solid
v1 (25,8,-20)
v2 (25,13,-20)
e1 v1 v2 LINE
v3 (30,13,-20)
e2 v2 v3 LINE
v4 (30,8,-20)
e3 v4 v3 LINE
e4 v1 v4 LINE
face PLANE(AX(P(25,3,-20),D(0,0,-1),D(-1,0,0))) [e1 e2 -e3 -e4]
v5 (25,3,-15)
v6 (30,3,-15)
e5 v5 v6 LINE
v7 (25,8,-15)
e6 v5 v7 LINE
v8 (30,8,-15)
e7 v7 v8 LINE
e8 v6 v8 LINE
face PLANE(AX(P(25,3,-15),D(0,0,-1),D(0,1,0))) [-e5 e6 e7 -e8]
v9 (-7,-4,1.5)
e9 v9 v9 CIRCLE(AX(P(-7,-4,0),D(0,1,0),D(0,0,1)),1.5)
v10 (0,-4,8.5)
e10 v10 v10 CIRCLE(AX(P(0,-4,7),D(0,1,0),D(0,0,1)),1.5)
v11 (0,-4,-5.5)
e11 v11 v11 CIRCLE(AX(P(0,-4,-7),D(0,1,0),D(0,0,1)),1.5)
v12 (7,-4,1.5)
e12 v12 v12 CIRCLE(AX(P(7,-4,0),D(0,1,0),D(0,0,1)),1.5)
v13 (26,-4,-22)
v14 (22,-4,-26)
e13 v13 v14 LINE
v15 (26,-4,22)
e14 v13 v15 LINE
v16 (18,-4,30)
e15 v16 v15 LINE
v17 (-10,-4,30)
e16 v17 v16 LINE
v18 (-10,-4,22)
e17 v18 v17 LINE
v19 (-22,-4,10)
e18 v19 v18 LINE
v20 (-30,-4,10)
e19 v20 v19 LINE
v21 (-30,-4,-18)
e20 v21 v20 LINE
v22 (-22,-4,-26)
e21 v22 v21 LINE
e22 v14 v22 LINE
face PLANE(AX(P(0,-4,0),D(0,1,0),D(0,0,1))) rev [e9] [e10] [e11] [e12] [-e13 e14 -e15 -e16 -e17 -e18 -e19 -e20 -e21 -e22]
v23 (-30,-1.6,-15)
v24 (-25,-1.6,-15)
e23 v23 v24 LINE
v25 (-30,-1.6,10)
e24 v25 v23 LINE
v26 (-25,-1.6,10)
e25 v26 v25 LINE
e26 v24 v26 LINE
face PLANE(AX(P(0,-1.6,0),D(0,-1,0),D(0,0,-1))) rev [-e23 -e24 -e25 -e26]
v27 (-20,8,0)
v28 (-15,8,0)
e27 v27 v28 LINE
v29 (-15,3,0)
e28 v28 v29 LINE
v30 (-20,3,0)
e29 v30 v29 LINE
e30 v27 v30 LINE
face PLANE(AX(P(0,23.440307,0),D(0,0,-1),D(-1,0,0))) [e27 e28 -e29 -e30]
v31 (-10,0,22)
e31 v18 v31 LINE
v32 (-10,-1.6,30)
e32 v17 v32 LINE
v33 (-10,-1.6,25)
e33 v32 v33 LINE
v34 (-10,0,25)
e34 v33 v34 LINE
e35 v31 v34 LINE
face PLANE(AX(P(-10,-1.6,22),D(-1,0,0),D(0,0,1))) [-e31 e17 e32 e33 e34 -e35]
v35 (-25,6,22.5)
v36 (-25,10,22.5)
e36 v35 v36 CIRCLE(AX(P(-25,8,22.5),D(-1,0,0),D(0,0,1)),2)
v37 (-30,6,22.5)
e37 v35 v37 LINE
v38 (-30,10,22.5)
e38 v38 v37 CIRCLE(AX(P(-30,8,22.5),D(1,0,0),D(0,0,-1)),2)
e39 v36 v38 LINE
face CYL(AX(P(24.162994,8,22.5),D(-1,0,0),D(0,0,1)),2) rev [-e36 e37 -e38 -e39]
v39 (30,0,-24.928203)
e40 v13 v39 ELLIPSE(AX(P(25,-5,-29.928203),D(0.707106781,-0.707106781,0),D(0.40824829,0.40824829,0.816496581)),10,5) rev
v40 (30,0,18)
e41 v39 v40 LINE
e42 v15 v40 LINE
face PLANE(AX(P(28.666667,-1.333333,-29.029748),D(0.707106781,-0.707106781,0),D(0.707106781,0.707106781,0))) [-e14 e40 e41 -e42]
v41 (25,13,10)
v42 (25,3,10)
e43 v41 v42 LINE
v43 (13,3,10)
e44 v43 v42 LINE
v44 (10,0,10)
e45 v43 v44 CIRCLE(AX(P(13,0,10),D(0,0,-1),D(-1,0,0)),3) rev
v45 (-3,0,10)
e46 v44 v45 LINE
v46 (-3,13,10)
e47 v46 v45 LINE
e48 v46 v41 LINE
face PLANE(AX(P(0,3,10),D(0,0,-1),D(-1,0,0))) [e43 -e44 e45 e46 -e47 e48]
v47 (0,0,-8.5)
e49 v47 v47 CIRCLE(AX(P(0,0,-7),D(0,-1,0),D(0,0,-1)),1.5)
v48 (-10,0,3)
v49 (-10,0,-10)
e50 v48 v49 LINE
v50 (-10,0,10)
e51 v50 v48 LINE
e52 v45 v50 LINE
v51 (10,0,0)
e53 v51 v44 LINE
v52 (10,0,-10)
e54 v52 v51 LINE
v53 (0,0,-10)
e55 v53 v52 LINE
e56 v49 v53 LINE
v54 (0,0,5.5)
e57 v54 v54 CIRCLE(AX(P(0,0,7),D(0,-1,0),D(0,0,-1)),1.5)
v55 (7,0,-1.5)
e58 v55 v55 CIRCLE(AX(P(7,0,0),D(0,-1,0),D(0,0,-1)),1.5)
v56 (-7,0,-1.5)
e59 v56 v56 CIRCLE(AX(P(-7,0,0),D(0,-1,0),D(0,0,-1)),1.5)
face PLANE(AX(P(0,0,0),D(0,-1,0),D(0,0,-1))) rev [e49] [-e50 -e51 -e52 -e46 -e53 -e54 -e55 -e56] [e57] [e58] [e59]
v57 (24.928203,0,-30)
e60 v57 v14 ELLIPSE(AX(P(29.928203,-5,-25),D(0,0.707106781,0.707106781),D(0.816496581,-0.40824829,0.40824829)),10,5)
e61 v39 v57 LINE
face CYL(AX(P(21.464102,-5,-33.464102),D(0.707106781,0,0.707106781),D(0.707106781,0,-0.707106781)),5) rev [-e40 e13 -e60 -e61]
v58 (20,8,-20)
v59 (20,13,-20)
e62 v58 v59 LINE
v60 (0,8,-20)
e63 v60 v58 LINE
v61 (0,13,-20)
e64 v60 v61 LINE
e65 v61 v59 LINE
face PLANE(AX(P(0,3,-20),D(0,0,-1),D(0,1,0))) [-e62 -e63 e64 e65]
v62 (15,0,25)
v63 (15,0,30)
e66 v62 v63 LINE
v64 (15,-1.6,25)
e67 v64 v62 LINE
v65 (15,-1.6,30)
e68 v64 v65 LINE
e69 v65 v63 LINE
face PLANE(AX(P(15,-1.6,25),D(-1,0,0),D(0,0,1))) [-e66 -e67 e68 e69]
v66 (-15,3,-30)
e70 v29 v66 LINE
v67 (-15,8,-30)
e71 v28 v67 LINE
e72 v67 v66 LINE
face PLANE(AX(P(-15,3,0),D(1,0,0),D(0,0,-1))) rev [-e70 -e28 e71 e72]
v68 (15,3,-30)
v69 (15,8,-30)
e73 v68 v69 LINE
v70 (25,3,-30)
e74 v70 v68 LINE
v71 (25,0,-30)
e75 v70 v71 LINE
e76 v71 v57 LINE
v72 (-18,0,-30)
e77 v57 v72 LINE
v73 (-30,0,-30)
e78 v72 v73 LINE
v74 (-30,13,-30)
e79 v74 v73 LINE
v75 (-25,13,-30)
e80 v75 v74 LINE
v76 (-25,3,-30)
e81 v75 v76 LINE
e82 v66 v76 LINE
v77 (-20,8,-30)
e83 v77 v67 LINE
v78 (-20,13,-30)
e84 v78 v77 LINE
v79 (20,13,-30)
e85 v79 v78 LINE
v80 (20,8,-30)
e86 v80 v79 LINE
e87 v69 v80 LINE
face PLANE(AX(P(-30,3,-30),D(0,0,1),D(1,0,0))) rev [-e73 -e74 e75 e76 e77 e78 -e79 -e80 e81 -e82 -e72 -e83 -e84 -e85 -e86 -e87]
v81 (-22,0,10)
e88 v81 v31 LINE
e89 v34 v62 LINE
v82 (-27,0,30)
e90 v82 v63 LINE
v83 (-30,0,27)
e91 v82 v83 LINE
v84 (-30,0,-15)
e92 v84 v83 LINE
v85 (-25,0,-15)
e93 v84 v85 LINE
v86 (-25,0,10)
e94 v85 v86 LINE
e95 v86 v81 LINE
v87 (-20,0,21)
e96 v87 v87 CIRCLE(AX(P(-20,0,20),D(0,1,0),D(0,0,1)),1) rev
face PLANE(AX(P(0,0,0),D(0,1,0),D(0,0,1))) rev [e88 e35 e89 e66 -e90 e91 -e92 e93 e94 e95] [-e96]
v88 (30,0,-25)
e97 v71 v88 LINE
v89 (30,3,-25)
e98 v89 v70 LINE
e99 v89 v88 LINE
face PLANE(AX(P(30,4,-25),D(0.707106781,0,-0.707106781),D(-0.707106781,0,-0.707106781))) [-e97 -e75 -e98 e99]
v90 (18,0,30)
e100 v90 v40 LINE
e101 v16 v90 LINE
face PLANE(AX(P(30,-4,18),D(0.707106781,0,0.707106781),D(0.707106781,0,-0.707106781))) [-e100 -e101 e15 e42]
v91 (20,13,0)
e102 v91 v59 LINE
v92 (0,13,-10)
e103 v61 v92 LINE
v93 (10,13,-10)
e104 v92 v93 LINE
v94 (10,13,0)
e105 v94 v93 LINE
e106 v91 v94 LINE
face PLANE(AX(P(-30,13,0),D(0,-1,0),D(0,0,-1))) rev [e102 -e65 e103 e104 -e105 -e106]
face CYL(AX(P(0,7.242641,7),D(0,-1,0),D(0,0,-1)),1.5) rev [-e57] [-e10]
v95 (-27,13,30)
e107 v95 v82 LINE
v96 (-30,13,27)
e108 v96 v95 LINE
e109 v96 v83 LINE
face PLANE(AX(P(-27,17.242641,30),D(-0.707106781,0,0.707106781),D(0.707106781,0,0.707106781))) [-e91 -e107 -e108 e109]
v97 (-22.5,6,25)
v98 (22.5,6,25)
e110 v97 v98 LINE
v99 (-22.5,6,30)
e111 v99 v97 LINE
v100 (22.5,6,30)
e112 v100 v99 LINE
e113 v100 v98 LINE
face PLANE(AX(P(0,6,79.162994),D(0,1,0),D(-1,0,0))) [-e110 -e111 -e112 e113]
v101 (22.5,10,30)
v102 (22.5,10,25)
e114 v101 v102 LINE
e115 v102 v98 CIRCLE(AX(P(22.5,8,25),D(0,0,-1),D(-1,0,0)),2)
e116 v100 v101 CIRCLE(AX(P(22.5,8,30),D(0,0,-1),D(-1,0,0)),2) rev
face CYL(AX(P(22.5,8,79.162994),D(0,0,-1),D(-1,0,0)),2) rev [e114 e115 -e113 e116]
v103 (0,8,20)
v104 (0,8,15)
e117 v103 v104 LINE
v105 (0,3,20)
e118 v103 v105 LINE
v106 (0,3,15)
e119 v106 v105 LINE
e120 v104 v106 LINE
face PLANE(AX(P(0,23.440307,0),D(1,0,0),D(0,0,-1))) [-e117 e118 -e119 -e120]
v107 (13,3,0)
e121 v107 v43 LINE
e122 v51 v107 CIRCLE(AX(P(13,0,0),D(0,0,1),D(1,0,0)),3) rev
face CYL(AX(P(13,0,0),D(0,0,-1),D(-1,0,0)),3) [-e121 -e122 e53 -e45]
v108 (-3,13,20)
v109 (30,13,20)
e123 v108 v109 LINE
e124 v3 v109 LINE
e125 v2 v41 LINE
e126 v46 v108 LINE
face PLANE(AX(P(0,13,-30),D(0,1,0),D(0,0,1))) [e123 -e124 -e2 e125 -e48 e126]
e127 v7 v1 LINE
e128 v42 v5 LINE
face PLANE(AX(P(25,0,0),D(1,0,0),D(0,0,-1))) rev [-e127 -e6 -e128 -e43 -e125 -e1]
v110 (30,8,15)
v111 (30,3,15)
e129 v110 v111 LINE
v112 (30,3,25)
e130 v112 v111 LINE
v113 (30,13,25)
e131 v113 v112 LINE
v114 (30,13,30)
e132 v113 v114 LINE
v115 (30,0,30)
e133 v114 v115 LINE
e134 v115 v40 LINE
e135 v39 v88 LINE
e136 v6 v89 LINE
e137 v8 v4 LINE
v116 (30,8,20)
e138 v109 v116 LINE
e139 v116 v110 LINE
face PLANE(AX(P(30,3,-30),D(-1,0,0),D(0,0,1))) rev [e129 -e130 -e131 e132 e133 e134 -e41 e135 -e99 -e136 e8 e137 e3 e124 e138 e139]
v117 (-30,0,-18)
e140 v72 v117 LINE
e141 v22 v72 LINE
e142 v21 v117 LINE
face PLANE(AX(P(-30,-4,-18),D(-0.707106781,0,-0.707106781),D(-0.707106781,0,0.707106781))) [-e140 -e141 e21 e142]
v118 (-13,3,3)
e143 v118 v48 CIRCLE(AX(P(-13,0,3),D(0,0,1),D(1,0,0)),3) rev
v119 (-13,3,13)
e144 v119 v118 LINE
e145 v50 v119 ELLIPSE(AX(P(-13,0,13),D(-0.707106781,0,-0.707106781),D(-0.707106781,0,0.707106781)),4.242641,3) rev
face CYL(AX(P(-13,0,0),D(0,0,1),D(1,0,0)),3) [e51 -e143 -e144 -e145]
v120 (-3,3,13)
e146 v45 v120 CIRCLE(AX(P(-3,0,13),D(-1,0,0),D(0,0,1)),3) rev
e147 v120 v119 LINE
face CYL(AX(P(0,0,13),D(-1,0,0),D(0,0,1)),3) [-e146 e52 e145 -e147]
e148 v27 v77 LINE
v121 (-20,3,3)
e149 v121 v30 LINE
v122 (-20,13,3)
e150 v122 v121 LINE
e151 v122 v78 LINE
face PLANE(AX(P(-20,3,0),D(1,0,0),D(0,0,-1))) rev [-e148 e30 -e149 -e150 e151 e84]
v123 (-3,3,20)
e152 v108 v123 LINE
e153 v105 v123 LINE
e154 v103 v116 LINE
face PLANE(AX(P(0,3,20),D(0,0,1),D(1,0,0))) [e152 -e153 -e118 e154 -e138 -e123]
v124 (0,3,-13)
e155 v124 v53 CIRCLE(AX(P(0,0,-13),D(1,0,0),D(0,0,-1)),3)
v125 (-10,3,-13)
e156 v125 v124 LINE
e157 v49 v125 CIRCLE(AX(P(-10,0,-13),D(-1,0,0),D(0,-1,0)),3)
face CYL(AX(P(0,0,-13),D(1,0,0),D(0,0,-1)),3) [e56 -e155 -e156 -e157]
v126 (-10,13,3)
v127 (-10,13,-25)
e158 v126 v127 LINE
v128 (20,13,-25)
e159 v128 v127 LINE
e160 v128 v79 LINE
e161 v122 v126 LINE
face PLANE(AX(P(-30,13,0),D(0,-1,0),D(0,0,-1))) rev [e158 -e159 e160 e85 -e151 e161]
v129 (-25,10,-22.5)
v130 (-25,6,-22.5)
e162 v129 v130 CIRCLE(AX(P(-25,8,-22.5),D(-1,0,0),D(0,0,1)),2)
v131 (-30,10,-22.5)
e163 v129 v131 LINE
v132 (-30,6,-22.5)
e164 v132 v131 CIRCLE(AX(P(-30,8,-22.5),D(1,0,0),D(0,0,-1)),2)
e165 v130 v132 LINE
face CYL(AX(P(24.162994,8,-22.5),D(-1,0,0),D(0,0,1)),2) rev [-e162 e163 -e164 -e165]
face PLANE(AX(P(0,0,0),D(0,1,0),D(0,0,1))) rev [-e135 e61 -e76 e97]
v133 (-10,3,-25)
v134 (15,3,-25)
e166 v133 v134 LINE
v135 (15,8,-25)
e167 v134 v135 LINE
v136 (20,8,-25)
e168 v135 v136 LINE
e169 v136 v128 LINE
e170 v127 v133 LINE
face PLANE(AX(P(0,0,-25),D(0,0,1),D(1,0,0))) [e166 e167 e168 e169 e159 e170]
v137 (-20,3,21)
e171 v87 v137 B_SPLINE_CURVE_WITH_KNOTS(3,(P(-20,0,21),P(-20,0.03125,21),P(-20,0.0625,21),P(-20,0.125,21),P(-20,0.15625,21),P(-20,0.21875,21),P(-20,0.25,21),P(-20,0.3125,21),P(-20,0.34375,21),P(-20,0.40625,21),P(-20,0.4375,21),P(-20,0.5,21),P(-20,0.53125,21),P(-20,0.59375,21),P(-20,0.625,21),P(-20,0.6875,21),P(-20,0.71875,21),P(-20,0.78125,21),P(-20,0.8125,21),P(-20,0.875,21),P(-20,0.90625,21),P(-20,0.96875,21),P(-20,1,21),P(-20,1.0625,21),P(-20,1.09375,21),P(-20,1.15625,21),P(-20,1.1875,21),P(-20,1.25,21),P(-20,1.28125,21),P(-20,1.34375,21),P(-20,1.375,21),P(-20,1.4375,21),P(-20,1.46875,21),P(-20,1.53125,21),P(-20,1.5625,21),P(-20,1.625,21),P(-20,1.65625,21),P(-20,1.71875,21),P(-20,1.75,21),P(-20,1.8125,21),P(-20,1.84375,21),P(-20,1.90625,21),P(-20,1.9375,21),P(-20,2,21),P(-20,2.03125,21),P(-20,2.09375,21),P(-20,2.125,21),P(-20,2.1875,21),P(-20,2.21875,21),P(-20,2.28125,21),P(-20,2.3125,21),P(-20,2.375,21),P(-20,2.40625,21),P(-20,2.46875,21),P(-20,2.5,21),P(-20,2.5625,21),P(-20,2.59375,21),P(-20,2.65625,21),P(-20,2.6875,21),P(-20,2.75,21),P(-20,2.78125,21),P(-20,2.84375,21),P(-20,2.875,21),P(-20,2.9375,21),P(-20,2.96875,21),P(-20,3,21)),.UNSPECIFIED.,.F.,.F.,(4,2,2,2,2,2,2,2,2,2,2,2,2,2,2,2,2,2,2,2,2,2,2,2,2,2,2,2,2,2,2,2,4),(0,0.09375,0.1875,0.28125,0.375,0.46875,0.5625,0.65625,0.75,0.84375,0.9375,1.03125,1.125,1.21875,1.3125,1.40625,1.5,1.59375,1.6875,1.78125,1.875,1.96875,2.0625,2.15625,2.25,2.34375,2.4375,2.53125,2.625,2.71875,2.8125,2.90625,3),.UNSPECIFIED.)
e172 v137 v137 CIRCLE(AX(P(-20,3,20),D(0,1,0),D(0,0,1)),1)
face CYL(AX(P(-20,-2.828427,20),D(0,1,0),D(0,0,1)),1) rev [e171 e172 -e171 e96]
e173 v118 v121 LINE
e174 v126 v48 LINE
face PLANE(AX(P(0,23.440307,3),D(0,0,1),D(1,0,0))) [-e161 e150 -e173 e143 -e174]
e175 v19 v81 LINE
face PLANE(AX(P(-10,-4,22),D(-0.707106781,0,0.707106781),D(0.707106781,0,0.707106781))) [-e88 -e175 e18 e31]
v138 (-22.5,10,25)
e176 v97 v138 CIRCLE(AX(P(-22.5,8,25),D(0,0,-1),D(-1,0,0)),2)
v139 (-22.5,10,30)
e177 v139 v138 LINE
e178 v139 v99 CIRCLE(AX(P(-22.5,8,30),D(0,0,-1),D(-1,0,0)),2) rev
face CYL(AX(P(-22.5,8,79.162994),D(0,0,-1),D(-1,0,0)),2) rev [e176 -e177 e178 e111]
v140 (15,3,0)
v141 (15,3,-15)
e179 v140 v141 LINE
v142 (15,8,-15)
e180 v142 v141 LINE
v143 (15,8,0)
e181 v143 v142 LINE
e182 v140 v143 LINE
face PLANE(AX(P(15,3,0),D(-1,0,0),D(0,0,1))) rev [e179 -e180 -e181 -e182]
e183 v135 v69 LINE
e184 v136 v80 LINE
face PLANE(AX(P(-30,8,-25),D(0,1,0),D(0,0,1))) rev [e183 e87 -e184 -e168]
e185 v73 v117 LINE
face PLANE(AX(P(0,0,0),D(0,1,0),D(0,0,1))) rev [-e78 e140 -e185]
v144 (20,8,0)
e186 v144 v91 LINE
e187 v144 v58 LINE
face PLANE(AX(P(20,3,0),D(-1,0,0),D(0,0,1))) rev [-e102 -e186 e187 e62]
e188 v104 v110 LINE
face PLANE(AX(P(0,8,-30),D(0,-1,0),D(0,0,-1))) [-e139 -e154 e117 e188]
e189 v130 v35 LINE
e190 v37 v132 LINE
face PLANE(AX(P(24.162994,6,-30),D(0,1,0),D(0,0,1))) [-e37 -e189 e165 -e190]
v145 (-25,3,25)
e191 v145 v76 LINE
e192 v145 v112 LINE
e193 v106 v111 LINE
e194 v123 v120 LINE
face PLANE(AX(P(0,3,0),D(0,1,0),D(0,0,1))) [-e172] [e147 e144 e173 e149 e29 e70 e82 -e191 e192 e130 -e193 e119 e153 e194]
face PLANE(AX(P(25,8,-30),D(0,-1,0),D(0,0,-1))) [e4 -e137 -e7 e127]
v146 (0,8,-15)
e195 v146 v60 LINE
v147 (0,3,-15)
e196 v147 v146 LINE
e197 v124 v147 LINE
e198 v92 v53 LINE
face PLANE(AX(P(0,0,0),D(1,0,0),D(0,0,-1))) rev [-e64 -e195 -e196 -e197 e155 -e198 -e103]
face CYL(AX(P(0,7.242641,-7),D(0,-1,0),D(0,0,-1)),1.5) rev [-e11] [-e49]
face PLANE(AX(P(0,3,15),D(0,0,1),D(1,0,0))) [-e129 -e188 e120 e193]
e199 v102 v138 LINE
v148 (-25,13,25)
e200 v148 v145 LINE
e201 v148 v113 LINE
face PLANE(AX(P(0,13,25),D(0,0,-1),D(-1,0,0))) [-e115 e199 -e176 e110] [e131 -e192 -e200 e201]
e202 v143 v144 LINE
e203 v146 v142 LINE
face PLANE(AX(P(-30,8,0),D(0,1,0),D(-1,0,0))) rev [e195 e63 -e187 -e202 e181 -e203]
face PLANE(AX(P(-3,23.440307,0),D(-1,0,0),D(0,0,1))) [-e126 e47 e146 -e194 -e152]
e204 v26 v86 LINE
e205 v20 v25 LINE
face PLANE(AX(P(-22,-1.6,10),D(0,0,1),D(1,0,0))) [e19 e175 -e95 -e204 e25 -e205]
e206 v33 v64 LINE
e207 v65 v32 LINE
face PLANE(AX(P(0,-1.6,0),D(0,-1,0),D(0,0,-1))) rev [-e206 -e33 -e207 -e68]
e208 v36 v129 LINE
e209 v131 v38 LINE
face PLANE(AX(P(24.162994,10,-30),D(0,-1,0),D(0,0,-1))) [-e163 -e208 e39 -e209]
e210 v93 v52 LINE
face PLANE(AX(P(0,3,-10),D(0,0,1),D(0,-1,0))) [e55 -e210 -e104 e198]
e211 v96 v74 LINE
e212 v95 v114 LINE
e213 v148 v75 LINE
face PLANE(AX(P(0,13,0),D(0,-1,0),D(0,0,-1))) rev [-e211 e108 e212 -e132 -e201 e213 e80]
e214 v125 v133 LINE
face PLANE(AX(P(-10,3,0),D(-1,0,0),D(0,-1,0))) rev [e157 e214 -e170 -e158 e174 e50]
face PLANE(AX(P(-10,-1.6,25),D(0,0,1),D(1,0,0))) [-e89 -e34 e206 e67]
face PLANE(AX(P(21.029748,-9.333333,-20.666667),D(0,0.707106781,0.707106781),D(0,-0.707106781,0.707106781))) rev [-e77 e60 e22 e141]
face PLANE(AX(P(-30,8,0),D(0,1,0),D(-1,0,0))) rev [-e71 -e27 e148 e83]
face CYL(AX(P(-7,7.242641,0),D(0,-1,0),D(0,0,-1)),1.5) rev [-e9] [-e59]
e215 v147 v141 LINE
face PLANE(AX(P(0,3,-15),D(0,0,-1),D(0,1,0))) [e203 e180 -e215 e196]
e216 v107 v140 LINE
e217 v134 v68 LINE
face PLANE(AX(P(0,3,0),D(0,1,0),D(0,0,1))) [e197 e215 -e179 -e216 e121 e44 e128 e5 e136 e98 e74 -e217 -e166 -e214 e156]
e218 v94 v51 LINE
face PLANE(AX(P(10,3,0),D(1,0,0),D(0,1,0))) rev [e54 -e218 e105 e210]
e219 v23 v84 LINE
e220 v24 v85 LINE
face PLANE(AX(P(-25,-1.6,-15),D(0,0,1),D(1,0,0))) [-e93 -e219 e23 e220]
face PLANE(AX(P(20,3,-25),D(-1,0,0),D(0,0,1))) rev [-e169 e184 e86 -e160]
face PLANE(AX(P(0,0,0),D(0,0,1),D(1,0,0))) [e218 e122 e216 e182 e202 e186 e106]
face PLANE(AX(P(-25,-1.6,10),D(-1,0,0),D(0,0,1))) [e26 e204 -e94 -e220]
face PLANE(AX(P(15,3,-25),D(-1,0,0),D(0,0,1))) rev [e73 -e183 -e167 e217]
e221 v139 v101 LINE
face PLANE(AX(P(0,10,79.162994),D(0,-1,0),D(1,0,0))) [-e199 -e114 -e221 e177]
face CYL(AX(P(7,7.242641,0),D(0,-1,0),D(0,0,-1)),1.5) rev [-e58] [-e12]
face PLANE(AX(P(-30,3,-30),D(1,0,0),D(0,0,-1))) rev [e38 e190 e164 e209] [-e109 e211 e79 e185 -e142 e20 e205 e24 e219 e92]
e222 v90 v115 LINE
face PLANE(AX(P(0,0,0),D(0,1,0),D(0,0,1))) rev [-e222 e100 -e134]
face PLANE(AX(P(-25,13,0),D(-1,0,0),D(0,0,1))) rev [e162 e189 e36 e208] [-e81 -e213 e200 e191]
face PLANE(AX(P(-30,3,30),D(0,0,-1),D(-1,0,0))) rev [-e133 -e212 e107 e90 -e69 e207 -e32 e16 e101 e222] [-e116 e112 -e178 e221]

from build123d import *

# Parameters (mm, degrees)
SKETCH_2_W           = 60
SKETCH_2_H           = 60
EXTRUDE_1_DEPTH      = 3
SKETCH_6_R           = 1.5
CUT_EXTRUDE_2_DEPTH  = 3
EXTRUDE_START        = -30
EXTRUDE_2_DEPTH      = 30
EXTRUDE_START_2      = 30
EXTRUDE_3_DEPTH      = 30
CUT_EXTRUDE_START    = 13
SKETCH_9_W           = 10
SKETCH_9_H           = 10
CUT_EXTRUDE_3_DEPTH  = 10
CUT_EXTRUDE_START_2  = -15
SKETCH_10_W          = 5
SKETCH_10_H          = 5
CUT_EXTRUDE_4_DEPTH  = 5
CUT_EXTRUDE_START_3  = 10
SKETCH_11_W          = 5
SKETCH_11_H          = 5
CUT_EXTRUDE_5_DEPTH  = 5
EXTRUDE_5_DEPTH      = 1.6
EXTRUDE_START_3      = -1.6
SKETCH_17_W          = 28
SKETCH_17_H          = 8
SKETCH_17_W_2        = 8
SKETCH_17_H_2        = 28
EXTRUDE_6_DEPTH      = 2
SKETCH_21_R          = 12.5
EXTRUDE_8_DEPTH      = 4
CUT_EXTRUDE_START_4  = -4
SKETCH_22_R          = 1.5
CUT_EXTRUDE_6_DEPTH  = 4
EXTRUDE_START_4      = -4
SKETCH_23_R          = 1.5
EXTRUDE_9_DEPTH      = 4
EXTRUDE_START_5      = -3.6
SKETCH_24_W          = 8
SKETCH_24_H          = 28
SKETCH_24_W_2        = 28
SKETCH_24_H_2        = 8
EXTRUDE_10_DEPTH     = 0.4
EXTRUDE_START_6      = 3
SKETCH_25_W          = 10
SKETCH_25_H          = 3
SKETCH_25_W_2        = 3
SKETCH_25_H_2        = 10
EXTRUDE_11_DEPTH     = 10
SKETCH_26_W          = 55
SKETCH_26_H          = 5
SKETCH_26_W_2        = 5
SKETCH_26_H_2        = 55
EXTRUDE_12_DEPTH     = 10
CUT_EXTRUDE_START_5  = -30
CUT_EXTRUDE_7_DEPTH  = 5
CUT_EXTRUDE_START_6  = 25
CUT_EXTRUDE_8_DEPTH  = 5
CUT_EXTRUDE_START_7  = 3
SKETCH_31_R          = 1
CUT_EXTRUDE_10_DEPTH = 3
CUT_EXTRUDE_11_DEPTH = 4
CUT_EXTRUDE_12_DEPTH = 13
SKETCH_34_W          = 20
SKETCH_34_H          = 20
CUT_EXTRUDE_14_DEPTH = 3
SKETCH_35_W          = 20
SKETCH_35_H          = 10
EXTRUDE_14_DEPTH     = 5
SKETCH_36_W          = 20
SKETCH_36_H          = 10
EXTRUDE_15_DEPTH     = 5
EXTRUDE_16_DEPTH     = 5
EXTRUDE_18_DEPTH     = 5
EXTRUDE_19_DEPTH     = 4
CUT_EXTRUDE_START_8  = -22
CUT_EXTRUDE_15_DEPTH = 44
CUT_EXTRUDE_16_DEPTH = 44
FILLET_1_R           = 5
FILLET_2_R           = 3


# Some blends are built 0.0001 mm under size
with BuildPart() as part:
    # 草图2 → 凸台-拉伸1 (new body)
    with BuildSketch(Plane(origin=(0, 0, 0), x_dir=(1, 0, 0), z_dir=(0, 1, 0))):
        Rectangle(SKETCH_2_W, SKETCH_2_H)
    extrude(amount=EXTRUDE_1_DEPTH)

    # 草图6 → 切除-拉伸2 (cut)
    with BuildSketch(Plane(origin=(0, 0, 0), x_dir=(1, 0, 0), z_dir=(0, 1, 0))):
        with Locations(Location((0, -7, 0), (0, 0, 270))):
            Circle(SKETCH_6_R)
        with Locations(Location((7, 0, 0), (0, 0, 270))):
            Circle(SKETCH_6_R)
        with Locations(Location((0, 7, 0), (0, 0, 270))):
            Circle(SKETCH_6_R)
        with Locations(Location((-7, 0, 0), (0, 0, 270))):
            Circle(SKETCH_6_R)
    extrude(amount=CUT_EXTRUDE_2_DEPTH, mode=Mode.SUBTRACT)

    # 草图7 → 凸台-拉伸2 (add)
    with BuildSketch(Plane.XY.offset(EXTRUDE_START)):
        Polygon((-15, 3), (-15, 8), (-20, 8), (-20, 13), (-10, 13), (-10, 3), align=None)
        Polygon((10, 3), (15, 3), (15, 8), (20, 8), (20, 13), (10, 13), align=None)
    extrude(amount=EXTRUDE_2_DEPTH)

    # 草图8 → 凸台-拉伸3 (add)
    with BuildSketch(Plane(origin=(0, 0, 0), x_dir=(0, 0, -1), z_dir=(1, 0, 0)).offset(EXTRUDE_START_2)):
        Polygon((-15, 3), (-15, 8), (-20, 8), (-20, 13), (-10, 13), (-10, 3), align=None)
        Polygon((10, 3), (15, 3), (15, 8), (20, 8), (20, 13), (10, 13), align=None)
    extrude(amount=-EXTRUDE_3_DEPTH)

    # 草图9 → 切除-拉伸3 (cut)
    with BuildSketch(Plane(origin=(0, 0, 0), x_dir=(1, 0, 0), z_dir=(0, 1, 0)).offset(CUT_EXTRUDE_START)):
        with Locations((25, 15)):
            Rectangle(SKETCH_9_W, SKETCH_9_H)
        with Locations((15, 25)):
            Rectangle(SKETCH_9_W, SKETCH_9_H)
    extrude(amount=-CUT_EXTRUDE_3_DEPTH, mode=Mode.SUBTRACT)

    # 草图10 → 切除-拉伸4 (cut)
    with BuildSketch(Plane.XY.offset(CUT_EXTRUDE_START_2)):
        with Locations((17.5, 5.5)):
            Rectangle(SKETCH_10_W, SKETCH_10_H)
    extrude(amount=CUT_EXTRUDE_4_DEPTH, mode=Mode.SUBTRACT)

    # 草图11 → 切除-拉伸5 (cut)
    with BuildSketch(Plane(origin=(0, 0, 0), x_dir=(0, 0, -1), z_dir=(1, 0, 0)).offset(CUT_EXTRUDE_START_3)):
        with Locations((17.5, 5.5)):
            Rectangle(SKETCH_11_W, SKETCH_11_H)
    extrude(amount=CUT_EXTRUDE_5_DEPTH, mode=Mode.SUBTRACT)

    # 草图16 → 凸台-拉伸5 (add)
    with BuildSketch(Plane(origin=(0, 0, 0), x_dir=(1, 0, 0), z_dir=(0, 1, 0))):
        Polygon((-10, -25), (15, -25), (15, -30), (18, -30), (18, -22), (-10, -22), align=None)
        Polygon((-22, 18), (-22, -10), (-25, -10), (-25, 15), (-30, 15), (-30, 18), align=None)
    extrude(amount=-EXTRUDE_5_DEPTH)

    # 草图17 → 凸台-拉伸6 (add)
    with BuildSketch(Plane(origin=(0, 0, 0), x_dir=(1, 0, 0), z_dir=(0, 1, 0)).offset(EXTRUDE_START_3)):
        with Locations((4, -26)):
            Rectangle(SKETCH_17_W, SKETCH_17_H)
        with Locations((-26, 4)):
            Rectangle(SKETCH_17_W_2, SKETCH_17_H_2)
    extrude(amount=-EXTRUDE_6_DEPTH)

    # 草图21 → 凸台-拉伸8 (add)
    with BuildSketch(Plane(origin=(0, 0, 0), x_dir=(1, 0, 0), z_dir=(0, 1, 0))):
        with Locations(Location((0, 0, 0), (0, 0, 270))):
            Circle(SKETCH_21_R)
    extrude(amount=-EXTRUDE_8_DEPTH)

    # 草图22 → 切除-拉伸6 (cut)
    with BuildSketch(Plane(origin=(0, 0, 0), x_dir=(1, 0, 0), z_dir=(0, 1, 0)).offset(CUT_EXTRUDE_START_4)):
        with Locations(Location((7, 0, 0), (0, 0, 270))):
            Circle(SKETCH_22_R)
        with Locations(Location((0, -7, 0), (0, 0, 270))):
            Circle(SKETCH_22_R)
        with Locations(Location((-7, 0, 0), (0, 0, 270))):
            Circle(SKETCH_22_R)
        with Locations(Location((0, 7, 0), (0, 0, 270))):
            Circle(SKETCH_22_R)
    extrude(amount=CUT_EXTRUDE_6_DEPTH, mode=Mode.SUBTRACT)

    # 草图23 → 凸台-拉伸9 (add)
    with BuildSketch(Plane(origin=(0, 0, 0), x_dir=(1, 0, 0), z_dir=(0, 1, 0)).offset(EXTRUDE_START_4)):
        Polygon((22, -18), (18, -22), (-10, -22), (-22, -10), (-22, 18), (-18, 22), (-18, 30), (18, 30), (18, 22), (22, 18), (30, 18), (30, -18), align=None)
        with Locations(Location((0, 7, 0), (0, 0, 270))):
            Circle(SKETCH_23_R, mode=Mode.SUBTRACT)
        with Locations(Location((7, 0, 0), (0, 0, 270))):
            Circle(SKETCH_23_R, mode=Mode.SUBTRACT)
        with Locations(Location((-7, 0, 0), (0, 0, 270))):
            Circle(SKETCH_23_R, mode=Mode.SUBTRACT)
        with Locations(Location((0, -7, 0), (0, 0, 270))):
            Circle(SKETCH_23_R, mode=Mode.SUBTRACT)
    extrude(amount=EXTRUDE_9_DEPTH)

    # 草图24 → 凸台-拉伸10 (add)
    with BuildSketch(Plane(origin=(0, 0, 0), x_dir=(1, 0, 0), z_dir=(0, 1, 0)).offset(EXTRUDE_START_5)):
        with Locations((-26, 4)):
            Rectangle(SKETCH_24_W, SKETCH_24_H)
        with Locations((4, -26)):
            Rectangle(SKETCH_24_W_2, SKETCH_24_H_2)
    extrude(amount=-EXTRUDE_10_DEPTH)

    # 草图25 → 凸台-拉伸11 (add)
    with BuildSketch(Plane(origin=(0, 0, 0), x_dir=(1, 0, 0), z_dir=(0, 1, 0)).offset(EXTRUDE_START_6)):
        with Locations((-15, -1.5)):
            Rectangle(SKETCH_25_W, SKETCH_25_H)
        with Locations((-1.5, -15)):
            Rectangle(SKETCH_25_W_2, SKETCH_25_H_2)
    extrude(amount=EXTRUDE_11_DEPTH)

    # 草图26 → 凸台-拉伸12 (add)
    with BuildSketch(Plane(origin=(0, 0, 0), x_dir=(1, 0, 0), z_dir=(0, 1, 0)).offset(EXTRUDE_START_6)):
        with Locations((2.5, -27.5)):
            Rectangle(SKETCH_26_W, SKETCH_26_H)
        with Locations((-27.5, 2.5)):
            Rectangle(SKETCH_26_W_2, SKETCH_26_H_2)
        with Locations((-27.5, -27.5)):
            Rectangle(SKETCH_26_W_2, SKETCH_26_H)
    extrude(amount=EXTRUDE_12_DEPTH)

    # 草图27 → 切除-拉伸7 (cut)
    with BuildSketch(Plane(origin=(0, 0, 0), x_dir=(0, 0, -1), z_dir=(1, 0, 0)).offset(CUT_EXTRUDE_START_5)):
        with BuildLine():
            Line((22.5, 6), (-22.5, 6))
            ThreePointArc((-22.5, 6), (-24.5, 8), (-22.5, 10))
            Line((-22.5, 10), (22.5, 10))
            ThreePointArc((22.5, 10), (24.5, 8), (22.5, 6))
        make_face()
    extrude(amount=CUT_EXTRUDE_7_DEPTH, mode=Mode.SUBTRACT)

    # 草图28 → 切除-拉伸8 (cut)
    with BuildSketch(Plane.XY.offset(CUT_EXTRUDE_START_6)):
        with BuildLine():
            Line((-22.5, 10), (22.5, 10))
            ThreePointArc((22.5, 10), (24.5, 8), (22.5, 6))
            Line((22.5, 6), (-22.5, 6))
            ThreePointArc((-22.5, 6), (-24.5, 8), (-22.5, 10))
        make_face()
    extrude(amount=CUT_EXTRUDE_8_DEPTH, mode=Mode.SUBTRACT)

    # 草图31 → 切除-拉伸10 (cut)
    with BuildSketch(Plane(origin=(0, 0, 0), x_dir=(1, 0, 0), z_dir=(0, 1, 0)).offset(CUT_EXTRUDE_START_7)):
        with Locations(Location((-20, -20, 0), (0, 0, 270))):
            Circle(SKETCH_31_R)
    extrude(amount=-CUT_EXTRUDE_10_DEPTH, mode=Mode.SUBTRACT)

    # 草图32 → 切除-拉伸11 (cut)
    with BuildSketch(Plane(origin=(0, 0, 0), x_dir=(1, 0, 0), z_dir=(0, 1, 0))):
        Polygon((30, 30), (30, 25), (25, 30), align=None)
    extrude(amount=CUT_EXTRUDE_11_DEPTH, mode=Mode.SUBTRACT)

    # 草图33 → 切除-拉伸12 (cut)
    with BuildSketch(Plane(origin=(0, 0, 0), x_dir=(1, 0, 0), z_dir=(0, 1, 0))):
        Polygon((-30, -30), (-27, -30), (-30, -27), align=None)
    extrude(amount=CUT_EXTRUDE_12_DEPTH, mode=Mode.SUBTRACT)

    # 草图34 → 切除-拉伸14 (cut)
    with BuildSketch(Plane(origin=(0, 0, 0), x_dir=(1, 0, 0), z_dir=(0, 1, 0)).offset(CUT_EXTRUDE_START_7)):
        Rectangle(SKETCH_34_W, SKETCH_34_H)
    extrude(amount=-CUT_EXTRUDE_14_DEPTH, mode=Mode.SUBTRACT)

    # 草图35 → 凸台-拉伸14 (add)
    with BuildSketch(Plane(origin=(0, 0, 0), x_dir=(0, 0, -1), z_dir=(1, 0, 0)).offset(EXTRUDE_START_2)):
        with Locations((0, 8)):
            Rectangle(SKETCH_35_W, SKETCH_35_H)
    extrude(amount=-EXTRUDE_14_DEPTH)

    # 草图36 → 凸台-拉伸15 (add)
    with BuildSketch(Plane.XY.offset(EXTRUDE_START)):
        with Locations((0, 8)):
            Rectangle(SKETCH_36_W, SKETCH_36_H)
    extrude(amount=EXTRUDE_15_DEPTH)

    # 草图37 → 凸台-拉伸16 (add)
    with BuildSketch(Plane.XY.offset(EXTRUDE_START)):
        Polygon((10, 3), (10, 13), (20, 13), (20, 8), (15, 8), (15, 3), align=None)
    extrude(amount=EXTRUDE_16_DEPTH)

    # 草图38 → 凸台-拉伸18 (add)
    with BuildSketch(Plane(origin=(0, 0, 0), x_dir=(0, 0, -1), z_dir=(1, 0, 0)).offset(EXTRUDE_START_2)):
        Polygon((10, 13), (20, 13), (20, 8), (15, 8), (15, 3), (10, 3), align=None)
    extrude(amount=-EXTRUDE_18_DEPTH)

    # 草图40 → 凸台-拉伸19 (add)
    with BuildSketch(Plane(origin=(0, 0, 0), x_dir=(1, 0, 0), z_dir=(0, 1, 0))):
        Polygon((-30, 18), (-18, 30), (-18, 22), (-22, 18), align=None)
        Polygon((18, 30), (30, 18), (22, 18), (18, 22), align=None)
        Polygon((30, -18), (18, -30), (18, -22), (22, -18), align=None)
    extrude(amount=-EXTRUDE_19_DEPTH)

    # 草图41 → 切除-拉伸15 (cut)
    with BuildSketch(Plane.XY.offset(CUT_EXTRUDE_START_8)):
        Polygon((30, 0), (26, -4), (30, -4), align=None)
    extrude(amount=CUT_EXTRUDE_15_DEPTH, mode=Mode.SUBTRACT)

    # 草图42 → 切除-拉伸16 (cut)
    with BuildSketch(Plane(origin=(0, 0, 0), x_dir=(0, 0, -1), z_dir=(1, 0, 0)).offset(CUT_EXTRUDE_START_8)):
        Polygon((30, -4), (30, 0), (26, -4), align=None)
    extrude(amount=CUT_EXTRUDE_16_DEPTH, mode=Mode.SUBTRACT)

    # 圆角1
    # the kernel refuses this fillet: 5 mm, written as the material it adds along each edge
    with BuildSketch(Plane(origin=(9.339745962, 0, -38.660254038), x_dir=(1.104671909501692e-12, -1.0, -1.104671909501665e-12), z_dir=(0.7071067811865389, 0, 0.7071067811865562))) as fillet_1_piece_1_section:
        with BuildLine():
            CenterArc((5, 4.898979486), FILLET_1_R, 180, 78.463040967)
            Line((0, 4.898979486), (-0.1, 4.898979486))
            Line((-0.1, 4.898979486), (-0.1, 0))
            Line((-0.1, 0), (0, -0.1))
            ThreePointArc((0, -0.1), (2, -0.1), (3.98, -0.09797959))
            Line((3.98, -0.09797959), (4, 0))
        make_face()
    fillet_1_piece_1 = extrude(amount=41.465460176, mode=Mode.PRIVATE)
    fillet_1_piece_1 = split(fillet_1_piece_1, bisect_by=Plane(origin=(24.77055683, -0.893670134, -30), z_dir=(0, 0, 1)), keep=Keep.TOP, mode=Mode.PRIVATE)
    fillet_1_piece_1 = split(fillet_1_piece_1, bisect_by=Plane(origin=(24.77055683, -3.061556652, -26.938443348), z_dir=(0, 0.7071067811865475, 0.7071067811865477)), keep=Keep.TOP, mode=Mode.PRIVATE)
    fillet_1_piece_1 = split(fillet_1_piece_1, bisect_by=Plane(origin=(26.938443348, -3.061556652, -24.77055683), z_dir=(-0.7071067811865591, 0.7071067811865359, 0)), keep=Keep.TOP, mode=Mode.PRIVATE)
    fillet_1_piece_1 = split(fillet_1_piece_1, bisect_by=Plane(origin=(30, -0.893670134, -24.77055683), z_dir=(-1, 0, 0)), keep=Keep.TOP, mode=Mode.PRIVATE)
    add(fillet_1_piece_1)

    # 圆角2
    fillet_2_edges = [part.edges().sort_by_distance(p)[0] for p in [
        (-6.5, 3, 10),
        (-10, 3, 6.5),
        (-5, 3, -10),
        (10, 3, 5),
    ]]
    fillet(fillet_2_edges, radius=FILLET_2_R - 0.0001)  # a hair under: the kernel refuses the full size


solid = part.part
